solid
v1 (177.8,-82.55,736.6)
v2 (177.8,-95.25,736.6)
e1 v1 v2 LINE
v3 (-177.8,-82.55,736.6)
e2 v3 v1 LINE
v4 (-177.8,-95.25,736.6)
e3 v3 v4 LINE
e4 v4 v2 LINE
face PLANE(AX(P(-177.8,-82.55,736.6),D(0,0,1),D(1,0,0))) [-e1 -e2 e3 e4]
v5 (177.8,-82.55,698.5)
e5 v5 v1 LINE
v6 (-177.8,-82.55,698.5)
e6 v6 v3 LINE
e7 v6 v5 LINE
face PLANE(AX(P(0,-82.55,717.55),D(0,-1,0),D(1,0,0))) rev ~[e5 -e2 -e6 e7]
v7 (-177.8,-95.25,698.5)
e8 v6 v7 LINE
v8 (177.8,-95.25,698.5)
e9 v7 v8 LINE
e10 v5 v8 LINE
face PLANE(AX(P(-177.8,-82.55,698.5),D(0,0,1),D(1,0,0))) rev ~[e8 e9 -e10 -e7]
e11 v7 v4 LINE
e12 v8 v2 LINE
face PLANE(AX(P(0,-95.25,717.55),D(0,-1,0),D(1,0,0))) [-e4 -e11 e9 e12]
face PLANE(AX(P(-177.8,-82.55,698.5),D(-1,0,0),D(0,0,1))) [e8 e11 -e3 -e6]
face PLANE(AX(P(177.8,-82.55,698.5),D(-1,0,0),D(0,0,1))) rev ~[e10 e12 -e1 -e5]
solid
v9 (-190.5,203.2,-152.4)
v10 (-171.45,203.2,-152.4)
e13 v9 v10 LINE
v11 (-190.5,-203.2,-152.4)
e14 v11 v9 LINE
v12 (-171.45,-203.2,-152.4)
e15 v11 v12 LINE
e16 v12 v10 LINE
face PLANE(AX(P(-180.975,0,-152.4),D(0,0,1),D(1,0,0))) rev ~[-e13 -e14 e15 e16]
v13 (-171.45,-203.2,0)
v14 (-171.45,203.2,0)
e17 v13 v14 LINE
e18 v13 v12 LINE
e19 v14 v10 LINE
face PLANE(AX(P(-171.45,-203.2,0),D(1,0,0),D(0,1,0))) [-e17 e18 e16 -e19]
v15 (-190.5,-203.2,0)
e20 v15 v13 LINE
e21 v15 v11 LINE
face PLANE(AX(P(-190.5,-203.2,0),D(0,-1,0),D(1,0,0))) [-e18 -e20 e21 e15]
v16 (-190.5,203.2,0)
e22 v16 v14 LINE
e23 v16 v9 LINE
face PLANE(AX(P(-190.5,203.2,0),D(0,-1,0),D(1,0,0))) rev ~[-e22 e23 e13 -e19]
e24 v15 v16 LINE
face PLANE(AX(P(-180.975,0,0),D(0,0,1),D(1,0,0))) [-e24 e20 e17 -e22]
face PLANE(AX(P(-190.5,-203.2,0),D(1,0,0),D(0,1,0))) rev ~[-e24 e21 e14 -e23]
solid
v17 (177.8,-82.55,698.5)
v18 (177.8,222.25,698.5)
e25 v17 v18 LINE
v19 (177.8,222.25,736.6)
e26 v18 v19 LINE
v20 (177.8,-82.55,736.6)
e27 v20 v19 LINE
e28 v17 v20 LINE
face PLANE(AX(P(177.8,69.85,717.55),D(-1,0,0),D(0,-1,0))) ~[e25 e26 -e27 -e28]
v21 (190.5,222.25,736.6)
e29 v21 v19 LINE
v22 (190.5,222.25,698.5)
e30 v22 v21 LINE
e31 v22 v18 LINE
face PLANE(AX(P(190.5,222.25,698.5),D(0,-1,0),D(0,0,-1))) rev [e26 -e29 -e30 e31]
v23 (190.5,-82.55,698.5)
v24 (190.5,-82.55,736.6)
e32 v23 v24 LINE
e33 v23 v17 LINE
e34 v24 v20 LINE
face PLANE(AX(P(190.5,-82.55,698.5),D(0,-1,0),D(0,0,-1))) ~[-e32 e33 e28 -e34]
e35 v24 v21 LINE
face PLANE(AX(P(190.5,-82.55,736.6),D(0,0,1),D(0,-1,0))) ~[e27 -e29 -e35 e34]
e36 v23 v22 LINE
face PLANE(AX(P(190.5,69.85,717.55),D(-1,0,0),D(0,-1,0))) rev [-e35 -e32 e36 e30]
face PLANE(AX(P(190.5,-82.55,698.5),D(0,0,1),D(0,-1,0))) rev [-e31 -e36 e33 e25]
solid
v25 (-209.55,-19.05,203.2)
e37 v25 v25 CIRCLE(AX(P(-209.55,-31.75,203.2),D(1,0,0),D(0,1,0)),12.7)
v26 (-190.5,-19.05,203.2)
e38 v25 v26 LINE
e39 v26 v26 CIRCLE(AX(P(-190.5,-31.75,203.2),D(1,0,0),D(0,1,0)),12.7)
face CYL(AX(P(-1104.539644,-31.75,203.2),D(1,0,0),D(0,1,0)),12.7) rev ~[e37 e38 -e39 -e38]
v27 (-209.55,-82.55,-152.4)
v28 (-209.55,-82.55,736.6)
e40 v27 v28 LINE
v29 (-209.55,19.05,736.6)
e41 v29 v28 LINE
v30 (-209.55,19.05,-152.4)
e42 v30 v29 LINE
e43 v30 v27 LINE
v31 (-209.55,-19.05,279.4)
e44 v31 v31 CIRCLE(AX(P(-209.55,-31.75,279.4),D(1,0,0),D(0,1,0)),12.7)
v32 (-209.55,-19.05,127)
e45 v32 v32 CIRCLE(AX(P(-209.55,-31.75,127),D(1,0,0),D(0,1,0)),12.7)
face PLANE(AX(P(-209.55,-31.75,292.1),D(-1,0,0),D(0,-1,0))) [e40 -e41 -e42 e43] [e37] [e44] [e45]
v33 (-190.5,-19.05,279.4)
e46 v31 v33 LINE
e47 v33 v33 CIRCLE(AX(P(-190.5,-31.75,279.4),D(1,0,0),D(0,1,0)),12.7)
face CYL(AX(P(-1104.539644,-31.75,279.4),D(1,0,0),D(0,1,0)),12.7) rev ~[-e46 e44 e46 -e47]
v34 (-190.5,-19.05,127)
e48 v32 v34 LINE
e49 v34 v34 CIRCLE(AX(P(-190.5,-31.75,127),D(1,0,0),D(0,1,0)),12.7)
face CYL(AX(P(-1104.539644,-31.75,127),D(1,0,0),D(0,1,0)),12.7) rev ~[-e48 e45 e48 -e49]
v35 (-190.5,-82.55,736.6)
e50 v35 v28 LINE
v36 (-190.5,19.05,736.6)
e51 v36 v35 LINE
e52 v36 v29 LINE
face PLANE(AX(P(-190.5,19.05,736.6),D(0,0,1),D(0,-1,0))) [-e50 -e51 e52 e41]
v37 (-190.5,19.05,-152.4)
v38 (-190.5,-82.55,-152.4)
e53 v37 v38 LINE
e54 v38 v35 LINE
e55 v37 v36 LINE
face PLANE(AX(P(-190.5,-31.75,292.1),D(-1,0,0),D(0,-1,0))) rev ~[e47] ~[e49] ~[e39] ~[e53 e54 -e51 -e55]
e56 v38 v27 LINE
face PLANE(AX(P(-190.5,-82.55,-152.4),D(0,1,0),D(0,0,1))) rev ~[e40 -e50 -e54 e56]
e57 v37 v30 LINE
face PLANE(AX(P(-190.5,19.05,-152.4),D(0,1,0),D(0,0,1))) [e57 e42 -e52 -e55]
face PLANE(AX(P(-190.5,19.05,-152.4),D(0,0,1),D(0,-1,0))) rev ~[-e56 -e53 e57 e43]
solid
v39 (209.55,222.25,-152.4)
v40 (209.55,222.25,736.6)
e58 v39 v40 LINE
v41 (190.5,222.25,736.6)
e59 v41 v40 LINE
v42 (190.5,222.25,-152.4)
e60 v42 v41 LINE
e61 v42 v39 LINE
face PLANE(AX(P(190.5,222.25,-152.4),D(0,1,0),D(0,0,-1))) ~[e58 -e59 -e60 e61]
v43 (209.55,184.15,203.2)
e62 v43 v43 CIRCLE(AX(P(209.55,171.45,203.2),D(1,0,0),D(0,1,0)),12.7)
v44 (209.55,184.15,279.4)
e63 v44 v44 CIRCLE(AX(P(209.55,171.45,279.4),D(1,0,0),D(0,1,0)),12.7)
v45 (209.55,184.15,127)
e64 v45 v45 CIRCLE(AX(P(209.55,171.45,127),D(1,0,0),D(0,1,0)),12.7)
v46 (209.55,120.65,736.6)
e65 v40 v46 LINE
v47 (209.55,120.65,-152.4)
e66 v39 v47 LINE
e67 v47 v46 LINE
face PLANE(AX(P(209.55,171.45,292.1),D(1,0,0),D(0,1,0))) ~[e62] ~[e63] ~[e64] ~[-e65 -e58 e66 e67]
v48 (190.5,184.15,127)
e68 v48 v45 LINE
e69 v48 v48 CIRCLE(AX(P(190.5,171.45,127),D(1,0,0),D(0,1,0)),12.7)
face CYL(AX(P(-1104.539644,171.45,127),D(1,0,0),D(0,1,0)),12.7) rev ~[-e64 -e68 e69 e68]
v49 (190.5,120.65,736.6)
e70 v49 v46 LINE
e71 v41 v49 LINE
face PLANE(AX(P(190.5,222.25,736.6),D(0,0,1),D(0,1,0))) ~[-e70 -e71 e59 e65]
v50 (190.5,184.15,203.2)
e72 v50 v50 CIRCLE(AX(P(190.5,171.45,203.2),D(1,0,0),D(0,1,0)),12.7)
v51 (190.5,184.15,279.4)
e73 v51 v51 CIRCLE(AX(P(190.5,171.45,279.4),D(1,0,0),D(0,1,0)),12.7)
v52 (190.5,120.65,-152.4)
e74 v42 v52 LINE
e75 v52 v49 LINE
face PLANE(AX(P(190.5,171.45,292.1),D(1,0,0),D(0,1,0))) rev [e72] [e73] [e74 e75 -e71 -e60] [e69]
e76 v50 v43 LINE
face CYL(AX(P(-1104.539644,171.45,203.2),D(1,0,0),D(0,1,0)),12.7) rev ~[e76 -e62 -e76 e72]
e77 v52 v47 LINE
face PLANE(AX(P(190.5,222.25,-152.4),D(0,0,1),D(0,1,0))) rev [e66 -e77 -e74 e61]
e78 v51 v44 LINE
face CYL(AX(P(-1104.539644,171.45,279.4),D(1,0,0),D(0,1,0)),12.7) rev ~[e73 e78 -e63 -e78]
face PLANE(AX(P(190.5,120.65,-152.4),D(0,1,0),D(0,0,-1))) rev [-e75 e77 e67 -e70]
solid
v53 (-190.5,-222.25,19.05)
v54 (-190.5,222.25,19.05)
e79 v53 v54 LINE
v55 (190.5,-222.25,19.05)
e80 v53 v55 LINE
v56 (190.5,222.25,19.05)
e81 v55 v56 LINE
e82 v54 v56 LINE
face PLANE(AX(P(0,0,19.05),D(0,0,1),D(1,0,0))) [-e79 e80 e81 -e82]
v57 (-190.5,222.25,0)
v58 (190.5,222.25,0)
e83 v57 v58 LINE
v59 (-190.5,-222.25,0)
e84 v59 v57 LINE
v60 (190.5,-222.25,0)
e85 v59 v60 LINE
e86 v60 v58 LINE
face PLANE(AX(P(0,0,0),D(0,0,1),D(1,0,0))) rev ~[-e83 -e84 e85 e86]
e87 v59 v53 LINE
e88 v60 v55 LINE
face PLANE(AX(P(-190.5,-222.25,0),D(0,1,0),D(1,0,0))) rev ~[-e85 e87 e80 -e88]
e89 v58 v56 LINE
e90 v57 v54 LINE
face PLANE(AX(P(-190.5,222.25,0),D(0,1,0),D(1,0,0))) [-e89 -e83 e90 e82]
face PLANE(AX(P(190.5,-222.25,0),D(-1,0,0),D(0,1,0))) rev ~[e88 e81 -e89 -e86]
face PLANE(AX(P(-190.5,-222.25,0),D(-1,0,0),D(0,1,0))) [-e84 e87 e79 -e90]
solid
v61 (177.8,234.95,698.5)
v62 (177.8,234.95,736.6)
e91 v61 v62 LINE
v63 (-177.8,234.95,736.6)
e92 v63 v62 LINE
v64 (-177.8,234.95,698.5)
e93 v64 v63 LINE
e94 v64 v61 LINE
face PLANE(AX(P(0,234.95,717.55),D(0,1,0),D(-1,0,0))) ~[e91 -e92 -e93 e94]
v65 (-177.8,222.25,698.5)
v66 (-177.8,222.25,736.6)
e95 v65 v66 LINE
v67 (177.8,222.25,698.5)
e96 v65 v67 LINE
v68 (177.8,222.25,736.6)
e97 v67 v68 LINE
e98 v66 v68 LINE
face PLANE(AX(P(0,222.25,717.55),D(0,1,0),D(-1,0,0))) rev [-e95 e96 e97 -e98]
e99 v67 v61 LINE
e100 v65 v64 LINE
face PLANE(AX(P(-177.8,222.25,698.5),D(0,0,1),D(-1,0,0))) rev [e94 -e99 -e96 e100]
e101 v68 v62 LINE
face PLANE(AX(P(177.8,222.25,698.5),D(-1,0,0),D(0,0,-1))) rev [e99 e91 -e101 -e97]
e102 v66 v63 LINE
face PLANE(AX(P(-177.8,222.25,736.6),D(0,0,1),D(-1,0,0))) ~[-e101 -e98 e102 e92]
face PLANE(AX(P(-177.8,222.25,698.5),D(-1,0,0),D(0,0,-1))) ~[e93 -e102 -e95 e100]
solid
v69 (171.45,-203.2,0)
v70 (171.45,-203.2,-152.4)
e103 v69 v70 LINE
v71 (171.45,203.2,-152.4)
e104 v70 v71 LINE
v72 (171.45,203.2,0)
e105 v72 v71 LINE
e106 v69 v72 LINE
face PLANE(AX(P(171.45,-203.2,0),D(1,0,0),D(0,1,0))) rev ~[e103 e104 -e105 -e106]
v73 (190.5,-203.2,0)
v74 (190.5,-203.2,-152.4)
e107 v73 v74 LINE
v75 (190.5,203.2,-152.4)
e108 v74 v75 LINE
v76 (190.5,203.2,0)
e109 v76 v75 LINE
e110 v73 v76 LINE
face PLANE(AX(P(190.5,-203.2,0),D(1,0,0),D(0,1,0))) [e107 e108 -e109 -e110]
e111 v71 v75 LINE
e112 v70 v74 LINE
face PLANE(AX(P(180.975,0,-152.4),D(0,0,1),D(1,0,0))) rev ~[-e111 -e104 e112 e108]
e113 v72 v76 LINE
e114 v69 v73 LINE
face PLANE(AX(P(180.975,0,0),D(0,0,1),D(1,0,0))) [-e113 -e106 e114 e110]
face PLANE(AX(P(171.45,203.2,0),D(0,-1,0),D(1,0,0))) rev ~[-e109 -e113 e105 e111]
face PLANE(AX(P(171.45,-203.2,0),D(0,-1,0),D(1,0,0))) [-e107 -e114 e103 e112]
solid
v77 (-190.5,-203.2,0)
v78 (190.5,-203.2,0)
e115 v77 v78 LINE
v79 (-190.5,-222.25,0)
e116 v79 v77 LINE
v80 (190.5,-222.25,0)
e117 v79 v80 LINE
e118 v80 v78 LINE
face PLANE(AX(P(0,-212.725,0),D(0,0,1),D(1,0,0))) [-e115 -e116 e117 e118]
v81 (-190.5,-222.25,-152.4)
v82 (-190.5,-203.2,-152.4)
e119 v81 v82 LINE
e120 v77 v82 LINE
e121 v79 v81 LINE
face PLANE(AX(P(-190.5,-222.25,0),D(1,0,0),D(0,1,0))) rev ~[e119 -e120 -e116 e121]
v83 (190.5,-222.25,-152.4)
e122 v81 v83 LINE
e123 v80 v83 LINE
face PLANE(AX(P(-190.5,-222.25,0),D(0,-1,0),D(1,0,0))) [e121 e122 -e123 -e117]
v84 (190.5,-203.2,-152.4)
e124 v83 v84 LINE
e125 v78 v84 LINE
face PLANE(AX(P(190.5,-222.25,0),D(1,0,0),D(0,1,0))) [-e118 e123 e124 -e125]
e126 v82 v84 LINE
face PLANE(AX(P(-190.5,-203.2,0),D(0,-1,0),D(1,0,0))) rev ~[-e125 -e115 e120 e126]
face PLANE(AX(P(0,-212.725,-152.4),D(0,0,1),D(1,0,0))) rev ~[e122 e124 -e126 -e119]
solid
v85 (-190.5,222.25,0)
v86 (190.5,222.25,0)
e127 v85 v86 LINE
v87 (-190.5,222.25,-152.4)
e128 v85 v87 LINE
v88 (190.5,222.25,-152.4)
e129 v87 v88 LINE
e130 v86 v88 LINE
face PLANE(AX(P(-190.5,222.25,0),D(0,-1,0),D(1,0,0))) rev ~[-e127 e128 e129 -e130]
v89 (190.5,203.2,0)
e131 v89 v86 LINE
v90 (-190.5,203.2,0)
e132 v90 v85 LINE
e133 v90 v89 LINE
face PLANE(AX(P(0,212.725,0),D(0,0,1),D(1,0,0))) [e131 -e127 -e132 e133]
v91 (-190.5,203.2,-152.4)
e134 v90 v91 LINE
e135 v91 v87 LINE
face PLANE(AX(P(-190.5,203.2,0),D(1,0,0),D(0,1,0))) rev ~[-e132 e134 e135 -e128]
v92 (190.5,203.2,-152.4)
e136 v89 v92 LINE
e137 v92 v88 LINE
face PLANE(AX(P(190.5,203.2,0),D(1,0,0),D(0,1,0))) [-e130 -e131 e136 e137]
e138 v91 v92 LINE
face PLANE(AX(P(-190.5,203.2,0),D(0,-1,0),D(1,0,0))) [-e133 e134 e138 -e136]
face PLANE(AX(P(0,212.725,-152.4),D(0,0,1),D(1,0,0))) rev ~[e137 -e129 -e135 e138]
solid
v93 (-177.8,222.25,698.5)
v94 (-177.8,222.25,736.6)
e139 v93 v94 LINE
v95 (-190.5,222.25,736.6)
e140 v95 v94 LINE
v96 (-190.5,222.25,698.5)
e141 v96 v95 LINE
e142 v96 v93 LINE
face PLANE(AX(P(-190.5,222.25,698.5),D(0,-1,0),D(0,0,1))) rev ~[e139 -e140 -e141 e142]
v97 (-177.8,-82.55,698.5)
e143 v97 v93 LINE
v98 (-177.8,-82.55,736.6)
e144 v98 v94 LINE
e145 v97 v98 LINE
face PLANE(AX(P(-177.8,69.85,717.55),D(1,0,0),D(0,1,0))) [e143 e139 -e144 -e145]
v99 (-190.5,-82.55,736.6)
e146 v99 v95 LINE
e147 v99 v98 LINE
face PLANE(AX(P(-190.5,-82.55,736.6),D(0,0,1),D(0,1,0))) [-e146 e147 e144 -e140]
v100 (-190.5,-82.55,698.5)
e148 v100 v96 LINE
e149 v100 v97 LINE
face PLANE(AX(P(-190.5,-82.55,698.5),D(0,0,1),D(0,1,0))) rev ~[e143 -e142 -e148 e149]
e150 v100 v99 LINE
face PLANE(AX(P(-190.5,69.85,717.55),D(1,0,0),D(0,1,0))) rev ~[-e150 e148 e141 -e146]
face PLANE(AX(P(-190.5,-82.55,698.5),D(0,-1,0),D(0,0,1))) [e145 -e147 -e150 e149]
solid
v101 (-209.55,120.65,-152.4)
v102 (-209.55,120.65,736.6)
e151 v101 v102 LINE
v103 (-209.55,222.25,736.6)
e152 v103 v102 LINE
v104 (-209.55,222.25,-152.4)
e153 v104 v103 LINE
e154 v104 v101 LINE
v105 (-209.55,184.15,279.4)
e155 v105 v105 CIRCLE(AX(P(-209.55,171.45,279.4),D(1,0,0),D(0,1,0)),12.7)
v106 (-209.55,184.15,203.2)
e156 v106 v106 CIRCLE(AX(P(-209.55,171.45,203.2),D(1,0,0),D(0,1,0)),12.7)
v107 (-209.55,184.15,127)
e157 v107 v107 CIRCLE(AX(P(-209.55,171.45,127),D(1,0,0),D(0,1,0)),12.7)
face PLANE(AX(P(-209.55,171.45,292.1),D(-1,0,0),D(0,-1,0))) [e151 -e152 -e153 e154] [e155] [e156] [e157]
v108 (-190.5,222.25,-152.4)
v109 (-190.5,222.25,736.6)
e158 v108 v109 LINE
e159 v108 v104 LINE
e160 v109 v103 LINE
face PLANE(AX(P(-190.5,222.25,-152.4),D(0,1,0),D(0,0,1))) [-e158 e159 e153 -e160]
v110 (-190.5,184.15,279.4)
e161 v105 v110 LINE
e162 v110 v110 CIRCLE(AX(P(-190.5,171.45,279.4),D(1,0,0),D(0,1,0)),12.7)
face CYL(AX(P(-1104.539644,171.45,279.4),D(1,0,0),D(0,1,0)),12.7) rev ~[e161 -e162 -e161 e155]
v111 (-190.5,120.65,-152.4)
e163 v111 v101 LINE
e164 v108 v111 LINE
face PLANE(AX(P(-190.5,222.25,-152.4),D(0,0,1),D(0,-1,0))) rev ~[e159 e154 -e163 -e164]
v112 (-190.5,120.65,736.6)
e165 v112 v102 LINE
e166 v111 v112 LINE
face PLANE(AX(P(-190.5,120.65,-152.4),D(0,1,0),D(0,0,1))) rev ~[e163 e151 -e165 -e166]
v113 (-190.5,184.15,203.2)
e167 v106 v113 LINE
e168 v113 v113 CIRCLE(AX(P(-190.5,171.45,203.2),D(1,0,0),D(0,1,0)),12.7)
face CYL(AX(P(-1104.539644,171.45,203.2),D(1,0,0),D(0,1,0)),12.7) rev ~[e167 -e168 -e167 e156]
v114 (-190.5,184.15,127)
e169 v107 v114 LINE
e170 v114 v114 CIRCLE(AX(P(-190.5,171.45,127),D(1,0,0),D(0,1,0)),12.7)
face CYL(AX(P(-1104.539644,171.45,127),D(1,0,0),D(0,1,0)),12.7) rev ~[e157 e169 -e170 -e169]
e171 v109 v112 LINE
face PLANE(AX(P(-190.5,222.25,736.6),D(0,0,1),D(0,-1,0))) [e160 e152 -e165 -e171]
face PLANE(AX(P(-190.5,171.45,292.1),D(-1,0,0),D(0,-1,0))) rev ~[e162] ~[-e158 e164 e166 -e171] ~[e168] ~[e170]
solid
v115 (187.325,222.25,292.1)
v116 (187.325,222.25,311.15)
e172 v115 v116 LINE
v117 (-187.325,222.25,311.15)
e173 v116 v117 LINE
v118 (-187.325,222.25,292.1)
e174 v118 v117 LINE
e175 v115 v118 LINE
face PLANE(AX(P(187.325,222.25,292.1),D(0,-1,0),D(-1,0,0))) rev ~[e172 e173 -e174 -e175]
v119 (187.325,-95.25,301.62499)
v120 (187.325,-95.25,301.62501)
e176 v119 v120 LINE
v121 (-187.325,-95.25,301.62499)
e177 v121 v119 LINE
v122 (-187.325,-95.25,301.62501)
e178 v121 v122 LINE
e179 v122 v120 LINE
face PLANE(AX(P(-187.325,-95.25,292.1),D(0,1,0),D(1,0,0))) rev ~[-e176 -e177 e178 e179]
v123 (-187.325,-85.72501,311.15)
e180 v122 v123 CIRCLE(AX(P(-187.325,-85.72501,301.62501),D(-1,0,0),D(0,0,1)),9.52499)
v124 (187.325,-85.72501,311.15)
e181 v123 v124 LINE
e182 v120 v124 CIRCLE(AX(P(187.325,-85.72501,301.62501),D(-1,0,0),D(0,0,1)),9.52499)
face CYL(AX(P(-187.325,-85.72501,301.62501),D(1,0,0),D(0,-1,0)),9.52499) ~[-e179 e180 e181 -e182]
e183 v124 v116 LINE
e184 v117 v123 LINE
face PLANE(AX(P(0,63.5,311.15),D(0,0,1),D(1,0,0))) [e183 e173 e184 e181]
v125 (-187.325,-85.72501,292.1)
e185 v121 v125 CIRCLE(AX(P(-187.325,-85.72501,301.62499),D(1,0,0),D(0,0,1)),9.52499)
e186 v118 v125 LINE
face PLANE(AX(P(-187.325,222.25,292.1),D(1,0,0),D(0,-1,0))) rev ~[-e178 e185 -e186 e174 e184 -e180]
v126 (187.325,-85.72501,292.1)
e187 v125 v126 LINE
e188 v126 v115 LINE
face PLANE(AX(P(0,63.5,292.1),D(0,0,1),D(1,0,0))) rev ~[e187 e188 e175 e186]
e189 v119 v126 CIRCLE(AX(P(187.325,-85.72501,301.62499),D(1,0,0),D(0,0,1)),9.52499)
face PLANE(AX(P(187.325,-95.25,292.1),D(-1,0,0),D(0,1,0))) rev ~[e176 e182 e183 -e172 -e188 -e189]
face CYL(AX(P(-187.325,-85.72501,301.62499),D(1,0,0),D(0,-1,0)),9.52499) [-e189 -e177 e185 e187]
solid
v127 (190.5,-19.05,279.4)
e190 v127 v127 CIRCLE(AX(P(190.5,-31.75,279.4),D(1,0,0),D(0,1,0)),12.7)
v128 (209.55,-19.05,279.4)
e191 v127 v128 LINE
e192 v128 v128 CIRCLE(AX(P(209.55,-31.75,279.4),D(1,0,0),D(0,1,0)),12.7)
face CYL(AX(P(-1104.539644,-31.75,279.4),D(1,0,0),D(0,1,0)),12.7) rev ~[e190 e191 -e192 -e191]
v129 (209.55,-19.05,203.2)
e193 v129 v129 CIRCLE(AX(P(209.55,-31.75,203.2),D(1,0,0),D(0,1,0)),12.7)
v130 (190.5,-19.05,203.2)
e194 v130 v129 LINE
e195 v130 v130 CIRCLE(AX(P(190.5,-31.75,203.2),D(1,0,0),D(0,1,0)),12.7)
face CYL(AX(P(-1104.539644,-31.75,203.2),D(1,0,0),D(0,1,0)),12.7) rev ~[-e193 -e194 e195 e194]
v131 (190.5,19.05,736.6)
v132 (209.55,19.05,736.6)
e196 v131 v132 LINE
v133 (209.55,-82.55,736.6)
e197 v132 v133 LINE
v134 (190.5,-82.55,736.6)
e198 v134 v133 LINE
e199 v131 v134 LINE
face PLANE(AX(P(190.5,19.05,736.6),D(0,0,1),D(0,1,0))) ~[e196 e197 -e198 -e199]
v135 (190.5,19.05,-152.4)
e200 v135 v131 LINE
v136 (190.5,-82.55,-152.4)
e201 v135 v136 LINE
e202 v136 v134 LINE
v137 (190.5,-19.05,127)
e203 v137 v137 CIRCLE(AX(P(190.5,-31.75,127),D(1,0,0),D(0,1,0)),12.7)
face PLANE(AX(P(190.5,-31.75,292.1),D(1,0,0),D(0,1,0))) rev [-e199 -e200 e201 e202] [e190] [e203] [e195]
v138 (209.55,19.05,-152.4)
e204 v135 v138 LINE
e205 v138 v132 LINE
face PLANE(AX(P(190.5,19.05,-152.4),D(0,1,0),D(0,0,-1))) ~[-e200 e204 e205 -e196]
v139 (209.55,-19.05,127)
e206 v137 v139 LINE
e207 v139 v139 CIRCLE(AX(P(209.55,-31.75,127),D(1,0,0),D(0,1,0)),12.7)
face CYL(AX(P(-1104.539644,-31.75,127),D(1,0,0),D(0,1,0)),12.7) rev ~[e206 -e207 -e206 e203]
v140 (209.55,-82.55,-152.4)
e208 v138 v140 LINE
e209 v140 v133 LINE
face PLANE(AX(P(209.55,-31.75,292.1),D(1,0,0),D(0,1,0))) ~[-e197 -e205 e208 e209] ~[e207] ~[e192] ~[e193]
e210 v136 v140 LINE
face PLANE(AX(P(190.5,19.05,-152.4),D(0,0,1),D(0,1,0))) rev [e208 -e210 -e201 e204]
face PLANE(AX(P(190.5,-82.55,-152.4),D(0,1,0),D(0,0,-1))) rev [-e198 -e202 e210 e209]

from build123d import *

# Parameters (mm, degrees)
F0_W      = 381
F0_H      = 444.5
F1_DEPTH  = 19.05
F2_W      = 381
F2_H      = 19.05
F3_DEPTH  = 152.4
F4_W      = 19.05
F4_H      = 406.4
F5_DEPTH  = 152.4
F6_W      = 101.6
F6_H      = 889
F7_DEPTH  = 19.05
F10_D     = 25.4
F10_2_D   = 25.4
F10_3_D   = 25.4
F10_4_D   = 25.4
F14_DEPTH = 19.05
F15_W     = 304.8
F15_H     = 38.1
F16_DEPTH = 12.7
F18_W     = 355.6
F18_H     = 38.1
F19_DEPTH = 12.7
F23_R     = 9.52499


# Not quite as in the source:
# - a fillet or chamfer is up to 0.001 mm smaller than in the source, because OpenCascade refuses the exact size


with BuildPart() as f1:
    # F0 (on Top) → F1 (new body)
    with BuildSketch(Plane.XY):
        Rectangle(F0_W, F0_H)
    extrude(amount=F1_DEPTH)


with BuildPart() as f3:
    # F2 (on face) → F3 (new body)
    with BuildSketch(Plane.XY):
        with Locations((0, 212.725)):
            Rectangle(F2_W, F2_H)
    extrude(amount=-F3_DEPTH)


with BuildPart() as f3b:
    # F2 (on face) → F3, piece 2 (new body)
    with BuildSketch(Plane.XY):
        with Locations((0, -212.725)):
            Rectangle(F2_W, F2_H)
    extrude(amount=-F3_DEPTH)


with BuildPart() as f5:
    # F4 (on face) → F5 (new body)
    with BuildSketch(Plane.XY):
        with Locations((-180.975, 0)):
            Rectangle(F4_W, F4_H)
    extrude(amount=-F5_DEPTH)


with BuildPart() as f5b:
    # F4 (on face) → F5, piece 2 (new body)
    with BuildSketch(Plane.XY):
        with Locations((180.975, 0)):
            Rectangle(F4_W, F4_H)
    extrude(amount=-F5_DEPTH)


with BuildPart() as f7:
    # F6 (on face) → F7 (new body)
    with BuildSketch(Plane(origin=(-190.5, 0, 0), x_dir=(0, -1, 0), z_dir=(-1, 0, 0))):
        with Locations((-171.45, 292.1)):
            Rectangle(F6_W, F6_H)
    extrude(amount=F7_DEPTH)


with BuildPart() as f7b:
    # F6 (on face) → F7, piece 2 (new body)
    with BuildSketch(Plane(origin=(-190.5, 0, 0), x_dir=(0, -1, 0), z_dir=(-1, 0, 0))):
        with Locations((31.75, 292.1)):
            Rectangle(F6_W, F6_H)
    extrude(amount=F7_DEPTH)


with BuildPart() as f8_1:
    # F8: instance of F7b
    add(f7b.part.mirror(Plane.YZ))

    # F10#3 (through all)
    with Locations(Plane(origin=(-209.55, 0, 0), x_dir=(0, -1, 0), z_dir=(-1, 0, 0))):
        with Locations((-171.45, 279.4), (31.75, 279.4), (31.75, 203.2), (-171.45, 203.2), (-171.45, 127), (31.75, 127)):
            Hole(F10_3_D / 2)


with BuildPart() as f8_2:
    # F8: instance of F7
    add(f7.part.mirror(Plane.YZ))

    # F10#4 (through all)
    with Locations(Plane(origin=(-209.55, 0, 0), x_dir=(0, -1, 0), z_dir=(-1, 0, 0))):
        with Locations((-171.45, 279.4), (31.75, 279.4), (31.75, 203.2), (-171.45, 203.2), (-171.45, 127), (31.75, 127)):
            Hole(F10_4_D / 2)


with BuildPart() as f7_1:
    add(f7.part)

    # F10 (through all)
    with Locations(Plane(origin=(-209.55, 0, 0), x_dir=(0, -1, 0), z_dir=(-1, 0, 0))):
        with Locations((-171.45, 279.4), (31.75, 279.4), (31.75, 203.2), (-171.45, 203.2), (-171.45, 127), (31.75, 127)):
            Hole(F10_D / 2)


with BuildPart() as f7b_1:
    add(f7b.part)

    # F10#2 (through all)
    with Locations(Plane(origin=(-209.55, 0, 0), x_dir=(0, -1, 0), z_dir=(-1, 0, 0))):
        with Locations((-171.45, 279.4), (31.75, 279.4), (31.75, 203.2), (-171.45, 203.2), (-171.45, 127), (31.75, 127)):
            Hole(F10_2_D / 2)


with BuildPart() as f14:
    # F13 (on plane+point) → F14 (new body)
    with BuildSketch(Plane.XY.offset(292.1)):
        Polygon((-187.325, -95.25), (187.325, -95.25), (187.325, -26.0919403405), (187.325, 222.25), (-187.325, 222.25), (-187.325, -82.55), align=None)
    extrude(amount=F14_DEPTH)

    # F23 (radius 9.525 in the source; OpenCascade refuses exactly that, so slightly less here)
    f23_edges = [f14.edges().sort_by_distance(p)[0] for p in [
        (0, -95.25, 311.15),
        (0, -95.25, 292.1),
    ]]
    fillet(f23_edges, radius=F23_R)


with BuildPart() as f16:
    # F15 (on face) → F16 (new body)
    with BuildSketch(Plane.YZ.offset(-190.5)):
        with Locations((69.85, 717.55)):
            Rectangle(F15_W, F15_H)
    extrude(amount=F16_DEPTH)


with BuildPart() as f17_1:
    # F17: instance of F16
    add(f16.part.mirror(Plane.YZ))


with BuildPart() as f19:
    # F18 (on face) → F19 (new body)
    with BuildSketch(Plane.XZ.offset(82.55)):
        with Locations((0, 717.55)):
            Rectangle(F18_W, F18_H)
    extrude(amount=F19_DEPTH)


with BuildPart() as f22_1:
    # F22: instance of F19
    add(f19.part.mirror(Plane.XZ.offset(-69.85)))


solid = Compound([f1.part, f3.part, f3b.part, f5.part, f5b.part, f8_1.part, f8_2.part, f7_1.part, f7b_1.part, f14.part, f16.part, f17_1.part, f19.part, f22_1.part])
